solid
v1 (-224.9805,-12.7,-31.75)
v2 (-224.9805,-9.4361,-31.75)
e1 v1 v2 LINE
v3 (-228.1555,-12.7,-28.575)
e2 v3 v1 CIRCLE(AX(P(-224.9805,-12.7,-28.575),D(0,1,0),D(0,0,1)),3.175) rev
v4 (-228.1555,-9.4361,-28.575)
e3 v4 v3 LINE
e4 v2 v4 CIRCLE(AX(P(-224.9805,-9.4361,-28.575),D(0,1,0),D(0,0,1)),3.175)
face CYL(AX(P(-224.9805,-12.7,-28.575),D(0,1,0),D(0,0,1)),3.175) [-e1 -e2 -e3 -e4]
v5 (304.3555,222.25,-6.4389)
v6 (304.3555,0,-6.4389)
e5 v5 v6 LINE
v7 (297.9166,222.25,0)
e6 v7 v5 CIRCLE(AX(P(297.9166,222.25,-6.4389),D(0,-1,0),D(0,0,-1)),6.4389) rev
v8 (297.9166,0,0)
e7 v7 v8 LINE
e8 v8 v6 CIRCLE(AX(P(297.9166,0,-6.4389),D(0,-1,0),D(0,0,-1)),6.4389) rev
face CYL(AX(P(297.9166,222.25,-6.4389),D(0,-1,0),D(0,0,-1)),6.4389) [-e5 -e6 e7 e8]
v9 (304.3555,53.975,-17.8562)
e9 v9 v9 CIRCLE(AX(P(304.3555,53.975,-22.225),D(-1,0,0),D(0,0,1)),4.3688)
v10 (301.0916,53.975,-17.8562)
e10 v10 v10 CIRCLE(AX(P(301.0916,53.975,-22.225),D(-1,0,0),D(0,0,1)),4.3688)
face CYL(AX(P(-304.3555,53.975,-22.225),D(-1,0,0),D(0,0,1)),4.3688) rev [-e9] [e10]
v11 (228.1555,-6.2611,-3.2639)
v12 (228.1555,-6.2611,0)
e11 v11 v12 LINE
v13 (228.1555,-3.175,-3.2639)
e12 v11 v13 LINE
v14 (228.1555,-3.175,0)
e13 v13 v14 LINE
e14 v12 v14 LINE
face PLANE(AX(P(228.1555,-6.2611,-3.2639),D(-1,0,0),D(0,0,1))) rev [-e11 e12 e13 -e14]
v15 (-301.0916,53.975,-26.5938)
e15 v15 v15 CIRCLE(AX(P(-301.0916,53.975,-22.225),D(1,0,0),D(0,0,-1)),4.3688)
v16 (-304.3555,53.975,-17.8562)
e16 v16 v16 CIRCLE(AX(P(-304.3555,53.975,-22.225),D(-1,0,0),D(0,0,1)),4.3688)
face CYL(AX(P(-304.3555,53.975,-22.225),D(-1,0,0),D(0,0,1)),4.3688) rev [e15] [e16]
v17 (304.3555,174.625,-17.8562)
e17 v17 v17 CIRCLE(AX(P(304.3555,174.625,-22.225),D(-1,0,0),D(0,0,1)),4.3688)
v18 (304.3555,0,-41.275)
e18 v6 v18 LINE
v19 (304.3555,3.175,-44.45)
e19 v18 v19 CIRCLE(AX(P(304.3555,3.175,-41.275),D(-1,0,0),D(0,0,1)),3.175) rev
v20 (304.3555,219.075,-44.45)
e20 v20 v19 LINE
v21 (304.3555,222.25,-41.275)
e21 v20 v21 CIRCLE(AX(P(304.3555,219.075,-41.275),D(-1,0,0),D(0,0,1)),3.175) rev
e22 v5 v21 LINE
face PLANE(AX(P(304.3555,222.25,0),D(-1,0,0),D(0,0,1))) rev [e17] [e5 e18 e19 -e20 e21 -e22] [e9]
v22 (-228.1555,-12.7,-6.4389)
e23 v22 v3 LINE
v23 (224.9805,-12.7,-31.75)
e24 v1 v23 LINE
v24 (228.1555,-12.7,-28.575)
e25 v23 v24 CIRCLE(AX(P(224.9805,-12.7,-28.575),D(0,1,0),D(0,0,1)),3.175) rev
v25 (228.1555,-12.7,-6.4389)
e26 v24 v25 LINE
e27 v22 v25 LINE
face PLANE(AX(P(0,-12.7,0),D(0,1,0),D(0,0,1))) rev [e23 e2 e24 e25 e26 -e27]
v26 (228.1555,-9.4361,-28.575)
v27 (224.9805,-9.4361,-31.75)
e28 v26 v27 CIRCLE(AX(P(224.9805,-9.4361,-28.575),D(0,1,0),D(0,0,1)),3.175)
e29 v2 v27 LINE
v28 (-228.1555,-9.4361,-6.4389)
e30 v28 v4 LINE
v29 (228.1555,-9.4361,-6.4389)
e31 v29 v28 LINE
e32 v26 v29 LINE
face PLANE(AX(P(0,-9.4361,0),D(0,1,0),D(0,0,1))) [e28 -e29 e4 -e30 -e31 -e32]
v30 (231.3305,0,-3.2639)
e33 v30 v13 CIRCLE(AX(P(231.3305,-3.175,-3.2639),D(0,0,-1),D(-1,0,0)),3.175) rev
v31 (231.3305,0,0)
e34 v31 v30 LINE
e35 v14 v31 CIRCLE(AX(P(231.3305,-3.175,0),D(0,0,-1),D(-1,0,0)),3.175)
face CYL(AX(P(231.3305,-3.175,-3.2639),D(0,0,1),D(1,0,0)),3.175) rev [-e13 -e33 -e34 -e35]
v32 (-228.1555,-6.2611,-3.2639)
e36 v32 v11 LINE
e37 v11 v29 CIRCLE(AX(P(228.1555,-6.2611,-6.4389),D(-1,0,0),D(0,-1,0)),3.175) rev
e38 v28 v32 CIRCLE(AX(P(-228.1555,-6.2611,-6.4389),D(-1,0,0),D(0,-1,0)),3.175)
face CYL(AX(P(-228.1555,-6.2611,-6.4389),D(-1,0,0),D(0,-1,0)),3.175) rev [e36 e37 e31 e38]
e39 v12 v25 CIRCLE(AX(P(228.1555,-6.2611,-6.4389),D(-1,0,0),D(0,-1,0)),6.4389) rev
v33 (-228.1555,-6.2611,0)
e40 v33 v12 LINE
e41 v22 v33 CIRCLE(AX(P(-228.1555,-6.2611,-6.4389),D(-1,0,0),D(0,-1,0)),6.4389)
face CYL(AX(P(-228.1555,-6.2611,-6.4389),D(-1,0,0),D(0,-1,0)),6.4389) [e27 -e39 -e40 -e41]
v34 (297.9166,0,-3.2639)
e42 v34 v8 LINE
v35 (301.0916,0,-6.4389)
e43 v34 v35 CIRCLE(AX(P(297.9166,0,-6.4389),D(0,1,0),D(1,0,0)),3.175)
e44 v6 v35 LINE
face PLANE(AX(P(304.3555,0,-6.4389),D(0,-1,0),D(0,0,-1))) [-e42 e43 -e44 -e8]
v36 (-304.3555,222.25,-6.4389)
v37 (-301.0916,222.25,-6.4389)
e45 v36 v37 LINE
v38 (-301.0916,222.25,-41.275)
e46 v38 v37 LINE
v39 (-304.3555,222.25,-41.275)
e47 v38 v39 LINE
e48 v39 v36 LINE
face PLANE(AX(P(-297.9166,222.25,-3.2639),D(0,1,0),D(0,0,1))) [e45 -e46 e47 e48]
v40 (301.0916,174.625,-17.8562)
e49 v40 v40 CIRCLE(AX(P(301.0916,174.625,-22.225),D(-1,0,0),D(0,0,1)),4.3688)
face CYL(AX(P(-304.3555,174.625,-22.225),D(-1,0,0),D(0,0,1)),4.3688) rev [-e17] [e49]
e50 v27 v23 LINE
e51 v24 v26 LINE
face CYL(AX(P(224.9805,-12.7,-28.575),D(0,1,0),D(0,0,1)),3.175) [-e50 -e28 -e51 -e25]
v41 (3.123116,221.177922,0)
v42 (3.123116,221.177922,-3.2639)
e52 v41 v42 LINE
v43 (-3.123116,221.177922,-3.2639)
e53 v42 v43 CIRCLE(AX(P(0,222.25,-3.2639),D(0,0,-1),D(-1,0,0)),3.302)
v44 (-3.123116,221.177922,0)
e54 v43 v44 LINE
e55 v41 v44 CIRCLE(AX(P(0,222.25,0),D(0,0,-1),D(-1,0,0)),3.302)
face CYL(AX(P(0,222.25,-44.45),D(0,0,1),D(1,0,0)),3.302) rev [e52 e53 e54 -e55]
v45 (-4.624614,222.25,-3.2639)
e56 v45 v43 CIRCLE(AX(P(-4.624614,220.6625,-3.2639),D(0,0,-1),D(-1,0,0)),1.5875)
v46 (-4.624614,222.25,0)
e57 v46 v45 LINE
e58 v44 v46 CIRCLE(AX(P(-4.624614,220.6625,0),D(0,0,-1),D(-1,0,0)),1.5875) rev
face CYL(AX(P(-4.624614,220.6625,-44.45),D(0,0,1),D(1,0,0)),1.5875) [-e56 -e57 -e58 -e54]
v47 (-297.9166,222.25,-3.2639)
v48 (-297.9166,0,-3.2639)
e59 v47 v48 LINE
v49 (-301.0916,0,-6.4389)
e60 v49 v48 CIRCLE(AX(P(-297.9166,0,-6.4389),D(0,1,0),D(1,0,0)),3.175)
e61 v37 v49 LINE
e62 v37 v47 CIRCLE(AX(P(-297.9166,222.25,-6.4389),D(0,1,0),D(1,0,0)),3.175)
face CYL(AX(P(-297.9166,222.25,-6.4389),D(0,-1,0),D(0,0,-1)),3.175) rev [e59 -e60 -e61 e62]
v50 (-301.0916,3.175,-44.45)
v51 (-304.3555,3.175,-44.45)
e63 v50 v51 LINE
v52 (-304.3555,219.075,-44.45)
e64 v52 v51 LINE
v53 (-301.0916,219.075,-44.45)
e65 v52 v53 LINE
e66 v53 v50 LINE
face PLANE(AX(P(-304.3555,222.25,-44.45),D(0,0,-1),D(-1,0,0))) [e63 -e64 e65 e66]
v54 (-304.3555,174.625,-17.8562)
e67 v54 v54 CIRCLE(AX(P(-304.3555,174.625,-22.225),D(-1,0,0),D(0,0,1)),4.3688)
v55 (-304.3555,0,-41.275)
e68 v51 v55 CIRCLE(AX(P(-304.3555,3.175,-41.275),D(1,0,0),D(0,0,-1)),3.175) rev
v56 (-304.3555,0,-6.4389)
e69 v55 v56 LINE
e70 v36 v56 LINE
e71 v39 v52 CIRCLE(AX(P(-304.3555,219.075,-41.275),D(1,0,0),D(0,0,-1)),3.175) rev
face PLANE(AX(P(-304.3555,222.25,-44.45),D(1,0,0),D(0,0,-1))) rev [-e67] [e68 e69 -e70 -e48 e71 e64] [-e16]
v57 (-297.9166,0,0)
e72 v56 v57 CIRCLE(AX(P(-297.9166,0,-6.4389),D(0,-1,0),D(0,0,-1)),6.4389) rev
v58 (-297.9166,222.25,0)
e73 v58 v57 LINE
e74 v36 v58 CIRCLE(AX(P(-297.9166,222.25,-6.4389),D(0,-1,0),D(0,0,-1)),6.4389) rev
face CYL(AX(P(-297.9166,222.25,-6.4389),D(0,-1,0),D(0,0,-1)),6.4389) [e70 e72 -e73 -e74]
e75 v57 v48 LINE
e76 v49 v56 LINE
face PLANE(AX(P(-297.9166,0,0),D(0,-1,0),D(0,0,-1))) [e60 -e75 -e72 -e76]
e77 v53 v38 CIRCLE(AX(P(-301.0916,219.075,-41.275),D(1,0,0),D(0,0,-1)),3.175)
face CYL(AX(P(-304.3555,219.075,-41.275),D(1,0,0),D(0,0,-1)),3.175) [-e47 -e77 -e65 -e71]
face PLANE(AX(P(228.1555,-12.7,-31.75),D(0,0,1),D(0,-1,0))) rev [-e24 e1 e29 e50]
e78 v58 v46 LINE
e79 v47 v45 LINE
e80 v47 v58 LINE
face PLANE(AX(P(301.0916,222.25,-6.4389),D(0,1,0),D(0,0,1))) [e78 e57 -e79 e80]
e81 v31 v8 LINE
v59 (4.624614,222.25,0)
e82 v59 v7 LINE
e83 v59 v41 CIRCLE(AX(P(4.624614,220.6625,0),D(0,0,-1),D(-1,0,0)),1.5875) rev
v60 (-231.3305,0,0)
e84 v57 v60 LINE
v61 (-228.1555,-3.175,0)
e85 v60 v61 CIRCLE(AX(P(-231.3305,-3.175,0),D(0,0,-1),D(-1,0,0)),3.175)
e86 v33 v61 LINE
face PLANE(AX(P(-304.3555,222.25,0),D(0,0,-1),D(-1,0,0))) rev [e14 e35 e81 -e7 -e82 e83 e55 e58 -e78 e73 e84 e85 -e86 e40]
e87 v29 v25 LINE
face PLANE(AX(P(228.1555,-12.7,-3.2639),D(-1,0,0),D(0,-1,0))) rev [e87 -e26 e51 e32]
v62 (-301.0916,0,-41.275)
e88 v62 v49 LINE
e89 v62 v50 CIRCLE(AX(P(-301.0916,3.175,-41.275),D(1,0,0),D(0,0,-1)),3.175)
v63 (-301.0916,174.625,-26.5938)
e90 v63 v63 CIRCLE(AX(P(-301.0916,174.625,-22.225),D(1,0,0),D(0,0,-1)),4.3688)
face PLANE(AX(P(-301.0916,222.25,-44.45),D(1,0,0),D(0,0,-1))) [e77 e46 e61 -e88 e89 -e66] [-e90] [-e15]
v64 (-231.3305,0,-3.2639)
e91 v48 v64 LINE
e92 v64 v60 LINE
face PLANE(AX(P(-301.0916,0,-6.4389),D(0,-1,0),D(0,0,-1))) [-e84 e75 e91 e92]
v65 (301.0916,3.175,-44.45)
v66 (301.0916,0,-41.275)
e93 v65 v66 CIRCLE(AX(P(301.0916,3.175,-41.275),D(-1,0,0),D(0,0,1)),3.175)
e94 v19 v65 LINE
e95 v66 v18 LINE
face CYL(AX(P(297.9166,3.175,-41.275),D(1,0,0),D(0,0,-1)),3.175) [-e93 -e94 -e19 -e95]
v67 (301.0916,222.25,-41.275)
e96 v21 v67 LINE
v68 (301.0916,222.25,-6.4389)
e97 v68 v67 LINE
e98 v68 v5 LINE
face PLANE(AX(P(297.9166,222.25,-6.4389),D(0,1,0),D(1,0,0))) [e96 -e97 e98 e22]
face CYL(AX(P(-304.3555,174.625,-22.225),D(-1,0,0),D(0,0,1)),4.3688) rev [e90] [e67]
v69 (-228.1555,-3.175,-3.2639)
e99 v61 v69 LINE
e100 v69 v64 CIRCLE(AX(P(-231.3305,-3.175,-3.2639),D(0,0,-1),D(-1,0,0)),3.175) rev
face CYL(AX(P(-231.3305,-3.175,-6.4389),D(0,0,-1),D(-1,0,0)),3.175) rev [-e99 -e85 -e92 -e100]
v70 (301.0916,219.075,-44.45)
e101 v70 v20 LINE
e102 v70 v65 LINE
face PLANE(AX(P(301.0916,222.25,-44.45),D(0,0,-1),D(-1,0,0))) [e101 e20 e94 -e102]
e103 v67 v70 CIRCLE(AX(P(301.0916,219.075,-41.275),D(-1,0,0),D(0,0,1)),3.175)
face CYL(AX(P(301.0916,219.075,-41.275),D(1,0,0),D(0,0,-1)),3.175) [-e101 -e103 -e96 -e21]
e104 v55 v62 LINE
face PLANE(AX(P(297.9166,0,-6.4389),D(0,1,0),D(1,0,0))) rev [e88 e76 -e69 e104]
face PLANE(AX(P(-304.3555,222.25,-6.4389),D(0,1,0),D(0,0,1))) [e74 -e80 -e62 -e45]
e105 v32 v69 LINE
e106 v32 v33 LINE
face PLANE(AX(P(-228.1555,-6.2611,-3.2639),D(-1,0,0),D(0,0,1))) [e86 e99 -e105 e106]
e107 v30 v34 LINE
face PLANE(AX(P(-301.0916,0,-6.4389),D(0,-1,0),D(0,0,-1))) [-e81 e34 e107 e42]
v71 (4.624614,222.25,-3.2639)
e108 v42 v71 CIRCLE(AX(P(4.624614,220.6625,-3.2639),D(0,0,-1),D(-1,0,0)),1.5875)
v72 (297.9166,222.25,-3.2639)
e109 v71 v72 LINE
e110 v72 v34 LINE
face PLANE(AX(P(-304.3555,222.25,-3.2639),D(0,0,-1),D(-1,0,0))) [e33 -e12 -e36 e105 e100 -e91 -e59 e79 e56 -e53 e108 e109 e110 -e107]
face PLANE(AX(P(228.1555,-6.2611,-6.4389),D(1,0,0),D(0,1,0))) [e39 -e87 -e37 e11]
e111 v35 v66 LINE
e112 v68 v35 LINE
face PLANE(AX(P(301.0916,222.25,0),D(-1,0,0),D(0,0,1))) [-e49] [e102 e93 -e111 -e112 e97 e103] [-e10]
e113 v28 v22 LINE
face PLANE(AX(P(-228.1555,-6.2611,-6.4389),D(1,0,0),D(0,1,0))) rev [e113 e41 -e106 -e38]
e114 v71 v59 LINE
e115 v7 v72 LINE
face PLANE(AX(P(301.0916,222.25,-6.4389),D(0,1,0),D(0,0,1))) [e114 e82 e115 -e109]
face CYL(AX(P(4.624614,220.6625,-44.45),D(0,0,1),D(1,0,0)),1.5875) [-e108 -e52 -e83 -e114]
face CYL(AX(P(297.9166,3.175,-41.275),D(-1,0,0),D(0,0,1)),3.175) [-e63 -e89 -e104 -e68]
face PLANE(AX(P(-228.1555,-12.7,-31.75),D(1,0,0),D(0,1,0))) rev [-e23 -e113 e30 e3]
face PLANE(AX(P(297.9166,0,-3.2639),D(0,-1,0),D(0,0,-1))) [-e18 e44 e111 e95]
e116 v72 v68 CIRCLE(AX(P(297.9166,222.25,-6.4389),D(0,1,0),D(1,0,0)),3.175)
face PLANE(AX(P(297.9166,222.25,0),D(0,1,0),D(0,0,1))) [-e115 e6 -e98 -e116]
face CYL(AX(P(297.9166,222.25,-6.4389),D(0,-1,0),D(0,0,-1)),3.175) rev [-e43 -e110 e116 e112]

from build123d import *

# Parameters (mm, degrees)
BASE_FLANGE1_DEPTH                        = 222.25
HOLE_FOR_1_4_SELF_CLINCHING_NUTS_S_SS_C_D = 8.7376
EDGE_FLANGE1_START                        = -228.1555
EDGE_FLANGE1_DEPTH                        = 456.311
SKETCH14_R                                = 3.302
CUT_EXTRUDE2_DEPTH                        = 380.477450424
FILLET1_R                                 = 1.5875
FILLET2_R                                 = 3.175


# Read off the part's stored shape, not the designer's step: Base-Flange1, Edge-Flange1
with BuildPart() as part:
    # Base-Flange1 outline → Base-Flange1 (new body)
    with BuildSketch(Plane(origin=(0, 0, 0), x_dir=(1, 0, 0), z_dir=(0, 1, 0))):
        with BuildLine():
            Line((304.3555, 6.4389), (304.3555, 44.45))
            Line((304.3555, 44.45), (301.0916, 44.45))
            Line((301.0916, 44.45), (301.0916, 6.4389))
            ThreePointArc((301.0916, 6.4389), (300.16166403, 4.19383597), (297.9166, 3.2639))
            Line((297.9166, 3.2639), (-297.9166, 3.2639))
            ThreePointArc((-297.9166, 3.2639), (-300.16166403, 4.19383597), (-301.0916, 6.4389))
            Line((-301.0916, 6.4389), (-301.0916, 44.45))
            Line((-301.0916, 44.45), (-304.3555, 44.45))
            Line((-304.3555, 44.45), (-304.3555, 6.4389))
            ThreePointArc((-304.3555, 6.4389), (-302.469589853, 1.885910147), (-297.9166, 0))
            Line((-297.9166, 0), (297.9166, 0))
            ThreePointArc((297.9166, 0), (302.469589853, 1.885910147), (304.3555, 6.4389))
        make_face()
    extrude(amount=BASE_FLANGE1_DEPTH)

    # Hole for 1/4 Self-clinching Nuts (S,SS,CLS,CLSS)1 (through all)
    with Locations(Plane.ZY.offset(304.3555)):
        with Locations((-22.225, 174.625), (-22.225, 53.975)):
            Hole(HOLE_FOR_1_4_SELF_CLINCHING_NUTS_S_SS_C_D / 2)

    # Edge-Flange1 outline → Edge-Flange1 (add)
    with BuildSketch(Plane.YZ.offset(EDGE_FLANGE1_START)):
        with BuildLine():
            ThreePointArc((-6.2611, 0), (-10.814089853, -1.885910147), (-12.7, -6.4389))
            Line((-12.7, -6.4389), (-12.7, -31.75))
            Line((-12.7, -31.75), (-9.4361, -31.75))
            Line((-9.4361, -31.75), (-9.4361, -6.4389))
            ThreePointArc((-9.4361, -6.4389), (-8.50616403, -4.19383597), (-6.2611, -3.2639))
            Line((-6.2611, -3.2639), (0, -3.2639))
            Line((0, -3.2639), (0, 0))
            Line((0, 0), (-6.2611, 0))
        make_face()
    extrude(amount=EDGE_FLANGE1_DEPTH)

    # Sketch14 → Cut-Extrude2 (cut, through all)
    with BuildSketch(Plane.XY):
        with Locations((0, 222.25)):
            Circle(SKETCH14_R)
    extrude(amount=-CUT_EXTRUDE2_DEPTH, mode=Mode.SUBTRACT)

    # Fillet1
    fillet1_edges = [part.edges().sort_by_distance(p)[0] for p in [
        (-3.302, 222.25, -1.63195),
        (3.302, 222.25, -1.63195),
    ]]
    fillet(fillet1_edges, radius=FILLET1_R)

    # Fillet2
    fillet2_edges = [part.edges().sort_by_distance(p)[0] for p in [
        (-302.72355, 0, -44.45),
        (302.72355, 0, -44.45),
        (-302.72355, 222.25, -44.45),
        (228.1555, 0, -1.63195),
        (-228.1555, 0, -1.63195),
        (228.1555, -11.06805, -31.75),
        (-228.1555, -11.06805, -31.75),
        (302.72355, 222.25, -44.45),
    ]]
    fillet(fillet2_edges, radius=FILLET2_R)


solid = part.part
